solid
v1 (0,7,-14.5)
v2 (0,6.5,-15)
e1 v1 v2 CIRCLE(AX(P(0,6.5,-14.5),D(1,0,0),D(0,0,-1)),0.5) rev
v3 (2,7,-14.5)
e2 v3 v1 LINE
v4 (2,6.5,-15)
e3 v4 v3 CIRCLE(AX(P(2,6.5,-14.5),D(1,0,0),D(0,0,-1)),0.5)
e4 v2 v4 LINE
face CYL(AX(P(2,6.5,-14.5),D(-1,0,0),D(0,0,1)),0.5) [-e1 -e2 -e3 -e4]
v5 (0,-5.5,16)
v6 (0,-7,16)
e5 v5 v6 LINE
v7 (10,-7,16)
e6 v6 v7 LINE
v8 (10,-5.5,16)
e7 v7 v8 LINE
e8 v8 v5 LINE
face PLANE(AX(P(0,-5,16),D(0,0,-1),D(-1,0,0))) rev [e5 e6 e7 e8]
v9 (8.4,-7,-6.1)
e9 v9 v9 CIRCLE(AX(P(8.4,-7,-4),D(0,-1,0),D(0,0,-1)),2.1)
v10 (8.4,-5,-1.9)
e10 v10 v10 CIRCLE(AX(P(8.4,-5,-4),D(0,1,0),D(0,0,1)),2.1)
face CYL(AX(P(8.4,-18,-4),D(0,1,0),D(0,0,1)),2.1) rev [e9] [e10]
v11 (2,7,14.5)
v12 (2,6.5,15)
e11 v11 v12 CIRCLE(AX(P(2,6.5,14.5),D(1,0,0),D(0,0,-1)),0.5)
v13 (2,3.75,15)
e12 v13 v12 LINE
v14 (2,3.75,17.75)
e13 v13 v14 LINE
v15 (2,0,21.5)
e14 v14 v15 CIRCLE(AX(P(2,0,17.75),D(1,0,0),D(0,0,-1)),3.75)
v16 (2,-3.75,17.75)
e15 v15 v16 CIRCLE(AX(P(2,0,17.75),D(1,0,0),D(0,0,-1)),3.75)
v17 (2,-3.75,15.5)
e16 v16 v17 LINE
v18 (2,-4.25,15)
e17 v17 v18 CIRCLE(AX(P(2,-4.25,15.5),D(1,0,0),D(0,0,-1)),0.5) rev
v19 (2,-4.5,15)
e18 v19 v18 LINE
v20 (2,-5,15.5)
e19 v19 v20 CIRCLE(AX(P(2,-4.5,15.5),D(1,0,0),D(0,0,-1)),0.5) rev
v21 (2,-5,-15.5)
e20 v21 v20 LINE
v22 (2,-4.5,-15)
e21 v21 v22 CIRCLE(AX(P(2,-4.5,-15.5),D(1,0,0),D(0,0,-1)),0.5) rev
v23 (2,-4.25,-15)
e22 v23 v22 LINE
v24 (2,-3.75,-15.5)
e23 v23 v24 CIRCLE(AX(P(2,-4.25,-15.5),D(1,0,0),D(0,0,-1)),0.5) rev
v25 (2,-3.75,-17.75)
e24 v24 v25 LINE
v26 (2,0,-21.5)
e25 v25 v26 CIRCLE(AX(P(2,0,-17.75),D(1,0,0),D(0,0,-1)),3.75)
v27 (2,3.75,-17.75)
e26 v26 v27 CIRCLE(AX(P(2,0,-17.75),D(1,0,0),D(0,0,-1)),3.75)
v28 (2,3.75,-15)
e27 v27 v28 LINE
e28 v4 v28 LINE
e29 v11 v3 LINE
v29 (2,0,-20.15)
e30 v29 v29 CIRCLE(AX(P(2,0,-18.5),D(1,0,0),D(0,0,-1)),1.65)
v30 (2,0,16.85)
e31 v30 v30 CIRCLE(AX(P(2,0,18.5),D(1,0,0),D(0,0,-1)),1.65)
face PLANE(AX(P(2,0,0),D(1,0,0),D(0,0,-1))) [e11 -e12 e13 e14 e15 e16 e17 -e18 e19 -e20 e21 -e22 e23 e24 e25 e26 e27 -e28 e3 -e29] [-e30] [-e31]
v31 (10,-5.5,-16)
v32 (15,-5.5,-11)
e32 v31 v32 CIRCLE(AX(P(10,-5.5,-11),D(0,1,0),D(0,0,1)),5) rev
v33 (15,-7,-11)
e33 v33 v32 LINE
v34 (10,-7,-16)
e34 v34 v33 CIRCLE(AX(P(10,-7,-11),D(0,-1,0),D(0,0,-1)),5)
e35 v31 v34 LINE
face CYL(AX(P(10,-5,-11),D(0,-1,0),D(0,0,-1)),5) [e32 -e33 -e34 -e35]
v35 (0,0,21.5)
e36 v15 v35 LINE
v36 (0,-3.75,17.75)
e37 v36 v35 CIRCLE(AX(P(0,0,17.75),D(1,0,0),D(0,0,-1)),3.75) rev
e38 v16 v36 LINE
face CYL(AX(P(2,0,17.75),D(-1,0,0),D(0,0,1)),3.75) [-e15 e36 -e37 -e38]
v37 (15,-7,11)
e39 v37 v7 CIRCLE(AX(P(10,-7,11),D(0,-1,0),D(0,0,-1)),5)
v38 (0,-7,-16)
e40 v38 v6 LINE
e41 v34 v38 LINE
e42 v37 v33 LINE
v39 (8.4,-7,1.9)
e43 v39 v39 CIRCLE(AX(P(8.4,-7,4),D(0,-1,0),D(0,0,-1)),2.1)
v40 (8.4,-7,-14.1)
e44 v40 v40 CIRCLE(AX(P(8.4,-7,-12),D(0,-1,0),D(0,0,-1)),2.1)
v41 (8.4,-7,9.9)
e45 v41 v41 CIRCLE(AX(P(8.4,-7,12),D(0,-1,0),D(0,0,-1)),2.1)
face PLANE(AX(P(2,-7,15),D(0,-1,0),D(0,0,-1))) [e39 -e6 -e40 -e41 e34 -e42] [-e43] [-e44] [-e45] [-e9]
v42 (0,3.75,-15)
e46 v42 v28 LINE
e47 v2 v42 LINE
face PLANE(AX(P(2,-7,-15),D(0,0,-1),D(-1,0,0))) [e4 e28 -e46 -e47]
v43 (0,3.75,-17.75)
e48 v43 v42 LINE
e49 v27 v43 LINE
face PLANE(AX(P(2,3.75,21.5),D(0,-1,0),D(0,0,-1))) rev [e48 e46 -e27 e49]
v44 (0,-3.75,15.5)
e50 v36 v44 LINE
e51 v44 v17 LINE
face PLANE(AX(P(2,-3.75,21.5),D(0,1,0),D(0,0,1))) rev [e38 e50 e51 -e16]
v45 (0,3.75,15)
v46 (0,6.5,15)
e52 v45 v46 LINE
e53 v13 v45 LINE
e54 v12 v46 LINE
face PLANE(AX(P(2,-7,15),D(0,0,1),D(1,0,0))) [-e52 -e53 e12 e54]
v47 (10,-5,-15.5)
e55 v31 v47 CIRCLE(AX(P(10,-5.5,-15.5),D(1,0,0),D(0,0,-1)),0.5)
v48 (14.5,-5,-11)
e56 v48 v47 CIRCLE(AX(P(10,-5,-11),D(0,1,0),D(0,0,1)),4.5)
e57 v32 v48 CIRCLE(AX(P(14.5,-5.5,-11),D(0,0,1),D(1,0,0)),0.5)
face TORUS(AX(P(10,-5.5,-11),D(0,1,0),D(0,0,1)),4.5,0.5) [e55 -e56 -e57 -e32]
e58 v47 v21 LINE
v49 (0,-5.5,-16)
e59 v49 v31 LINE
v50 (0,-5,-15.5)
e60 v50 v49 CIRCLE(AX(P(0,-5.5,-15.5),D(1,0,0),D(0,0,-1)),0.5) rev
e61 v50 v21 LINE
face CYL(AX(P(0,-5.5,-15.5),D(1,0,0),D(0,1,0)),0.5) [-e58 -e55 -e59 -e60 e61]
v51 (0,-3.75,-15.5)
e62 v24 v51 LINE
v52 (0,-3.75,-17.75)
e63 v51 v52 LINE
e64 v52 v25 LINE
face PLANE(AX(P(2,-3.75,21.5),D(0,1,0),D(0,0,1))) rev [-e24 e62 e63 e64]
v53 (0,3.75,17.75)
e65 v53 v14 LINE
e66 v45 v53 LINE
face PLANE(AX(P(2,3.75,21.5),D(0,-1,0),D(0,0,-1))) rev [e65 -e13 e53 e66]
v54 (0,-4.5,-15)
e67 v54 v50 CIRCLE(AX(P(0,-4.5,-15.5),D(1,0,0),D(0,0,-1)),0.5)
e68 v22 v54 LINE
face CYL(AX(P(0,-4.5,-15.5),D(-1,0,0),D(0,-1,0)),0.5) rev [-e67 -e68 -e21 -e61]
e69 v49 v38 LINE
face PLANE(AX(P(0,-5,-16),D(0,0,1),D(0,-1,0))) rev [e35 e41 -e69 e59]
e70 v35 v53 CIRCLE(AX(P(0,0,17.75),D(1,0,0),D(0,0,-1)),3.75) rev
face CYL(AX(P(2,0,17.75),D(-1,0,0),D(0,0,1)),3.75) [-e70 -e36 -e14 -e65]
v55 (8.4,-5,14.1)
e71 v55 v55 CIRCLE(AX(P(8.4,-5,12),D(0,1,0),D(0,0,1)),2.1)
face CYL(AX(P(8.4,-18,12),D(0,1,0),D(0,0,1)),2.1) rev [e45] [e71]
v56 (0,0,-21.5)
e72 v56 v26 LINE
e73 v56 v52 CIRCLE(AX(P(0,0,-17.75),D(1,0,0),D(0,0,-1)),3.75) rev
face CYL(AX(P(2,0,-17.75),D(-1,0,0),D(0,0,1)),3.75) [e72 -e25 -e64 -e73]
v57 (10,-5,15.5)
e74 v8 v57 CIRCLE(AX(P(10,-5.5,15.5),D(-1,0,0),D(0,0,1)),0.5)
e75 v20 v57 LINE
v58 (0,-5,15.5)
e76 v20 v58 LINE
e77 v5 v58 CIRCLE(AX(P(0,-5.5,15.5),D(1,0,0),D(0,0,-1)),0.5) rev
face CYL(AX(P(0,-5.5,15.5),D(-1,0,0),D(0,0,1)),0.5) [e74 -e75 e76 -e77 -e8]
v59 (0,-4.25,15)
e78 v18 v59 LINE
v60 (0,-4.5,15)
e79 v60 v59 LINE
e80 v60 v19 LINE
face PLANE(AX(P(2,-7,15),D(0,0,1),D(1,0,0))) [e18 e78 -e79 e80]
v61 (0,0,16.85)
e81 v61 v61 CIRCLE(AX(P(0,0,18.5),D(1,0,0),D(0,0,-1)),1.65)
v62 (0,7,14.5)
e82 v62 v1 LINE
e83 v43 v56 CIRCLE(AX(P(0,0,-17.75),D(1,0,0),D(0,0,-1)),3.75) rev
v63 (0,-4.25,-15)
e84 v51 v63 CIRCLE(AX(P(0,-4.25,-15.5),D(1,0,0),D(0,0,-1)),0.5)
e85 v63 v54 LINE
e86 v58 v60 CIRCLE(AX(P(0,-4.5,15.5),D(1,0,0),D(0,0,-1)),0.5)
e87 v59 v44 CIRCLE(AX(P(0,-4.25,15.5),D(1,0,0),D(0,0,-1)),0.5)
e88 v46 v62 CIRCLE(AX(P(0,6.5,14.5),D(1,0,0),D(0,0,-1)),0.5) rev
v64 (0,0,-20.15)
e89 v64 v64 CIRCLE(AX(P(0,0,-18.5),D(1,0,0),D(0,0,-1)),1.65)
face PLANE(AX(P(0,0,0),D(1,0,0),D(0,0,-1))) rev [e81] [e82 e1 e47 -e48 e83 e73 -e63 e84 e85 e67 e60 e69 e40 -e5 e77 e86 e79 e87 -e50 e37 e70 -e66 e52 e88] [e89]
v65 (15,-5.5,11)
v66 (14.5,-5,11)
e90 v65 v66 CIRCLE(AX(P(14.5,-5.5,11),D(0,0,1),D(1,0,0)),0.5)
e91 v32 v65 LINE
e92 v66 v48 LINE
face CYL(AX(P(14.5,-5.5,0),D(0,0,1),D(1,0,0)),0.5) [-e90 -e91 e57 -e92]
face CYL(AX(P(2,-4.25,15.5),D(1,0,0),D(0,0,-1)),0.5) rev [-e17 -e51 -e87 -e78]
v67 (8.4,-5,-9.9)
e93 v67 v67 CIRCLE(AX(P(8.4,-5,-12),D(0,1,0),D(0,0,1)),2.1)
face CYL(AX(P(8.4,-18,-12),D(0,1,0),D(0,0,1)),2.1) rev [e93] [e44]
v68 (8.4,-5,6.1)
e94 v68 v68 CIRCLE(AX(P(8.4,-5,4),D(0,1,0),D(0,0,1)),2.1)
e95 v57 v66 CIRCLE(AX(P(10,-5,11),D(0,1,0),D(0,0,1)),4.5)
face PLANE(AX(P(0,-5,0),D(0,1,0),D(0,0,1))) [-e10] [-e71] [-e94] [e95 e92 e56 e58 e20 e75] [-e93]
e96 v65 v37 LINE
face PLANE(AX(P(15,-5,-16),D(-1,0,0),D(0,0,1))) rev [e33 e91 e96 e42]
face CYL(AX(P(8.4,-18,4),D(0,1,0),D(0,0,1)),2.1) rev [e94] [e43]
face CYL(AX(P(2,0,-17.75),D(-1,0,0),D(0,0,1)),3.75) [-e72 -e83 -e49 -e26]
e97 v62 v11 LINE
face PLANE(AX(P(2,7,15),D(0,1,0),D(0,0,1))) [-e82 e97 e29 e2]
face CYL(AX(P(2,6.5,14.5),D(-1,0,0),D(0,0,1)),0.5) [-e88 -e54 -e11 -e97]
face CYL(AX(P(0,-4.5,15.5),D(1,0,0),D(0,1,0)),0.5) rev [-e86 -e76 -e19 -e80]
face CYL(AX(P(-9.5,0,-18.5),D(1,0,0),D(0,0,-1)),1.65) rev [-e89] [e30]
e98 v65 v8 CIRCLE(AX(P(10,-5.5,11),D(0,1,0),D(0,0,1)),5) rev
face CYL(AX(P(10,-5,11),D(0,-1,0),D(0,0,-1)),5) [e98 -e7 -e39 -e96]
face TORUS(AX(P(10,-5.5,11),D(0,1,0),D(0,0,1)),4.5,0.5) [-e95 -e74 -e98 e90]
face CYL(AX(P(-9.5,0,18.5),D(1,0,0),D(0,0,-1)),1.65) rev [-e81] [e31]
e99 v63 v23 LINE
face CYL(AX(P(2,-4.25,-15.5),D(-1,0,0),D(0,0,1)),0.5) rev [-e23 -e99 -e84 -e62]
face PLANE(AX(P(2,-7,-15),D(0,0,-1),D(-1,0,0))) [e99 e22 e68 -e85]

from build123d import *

# Parameters (mm, degrees)
SKETCH_1_W          = 43
SKETCH_1_H          = 7.5
EXTRUDE_1_DEPTH     = 2
SKETCH_2_R          = 1.65
CUT_EXTRUDE_2_DEPTH = 11.5
FILLET_1_R          = 3.75
SKETCH_3_W          = 30
SKETCH_3_H          = 14
EXTRUDE_3_DEPTH     = 2
SKETCH_4_W          = 15
SKETCH_4_H          = 32
EXTRUDE_4_DEPTH     = 2
SKETCH_5_R          = 2.1
CUT_EXTRUDE_3_DEPTH = 13
FILLET_3_R          = 5
FILLET_5_R          = 0.5
FILLET_6_R          = 0.5
FILLET_7_R          = 0.5


with BuildPart() as part:
    # 草圖1 → 填料-伸長1 (new body)
    with BuildSketch(Plane(origin=(0, 0, 0), x_dir=(0, 0, -1), z_dir=(1, 0, 0))):
        Rectangle(SKETCH_1_W, SKETCH_1_H)
    extrude(amount=EXTRUDE_1_DEPTH)

    # 草圖2 → 除料-伸長2 (cut)
    with BuildSketch(Plane(origin=(2, 0, 0), x_dir=(0, 0, -1), z_dir=(1, 0, 0))):
        with Locations((-18.5, 0)):
            Circle(SKETCH_2_R)
        with Locations((18.5, 0)):
            Circle(SKETCH_2_R)
    extrude(amount=-CUT_EXTRUDE_2_DEPTH, mode=Mode.SUBTRACT)

    # 圓角1
    fillet_1_edges = [part.edges().sort_by_distance(p)[0] for p in [
        (1, -3.75, -21.5),
        (1, 3.75, -21.5),
        (1, -3.75, 21.5),
        (1, 3.75, 21.5),
    ]]
    fillet(fillet_1_edges, radius=FILLET_1_R - 0.0001)  # a hair under: the kernel refuses the full size

    # 草圖3 → 填料-伸長3 (add)
    with BuildSketch(Plane.ZY):
        Rectangle(SKETCH_3_W, SKETCH_3_H)
    extrude(amount=-EXTRUDE_3_DEPTH)

    # 草圖4 → 填料-伸長4 (add)
    with BuildSketch(Plane(origin=(0, -7, 0), x_dir=(1, 0, 0), z_dir=(0, 1, 0))):
        with Locations((7.5, 0)):
            Rectangle(SKETCH_4_W, SKETCH_4_H)
    extrude(amount=EXTRUDE_4_DEPTH)

    # 草圖5 → 除料-伸長3 (cut)
    with BuildSketch(Plane(origin=(0, -5, 0), x_dir=(-1, 0, 0), z_dir=(0, 1, 0))):
        with Locations(Location((-8.4, 12, 0), (0, 0, 90))):
            Circle(SKETCH_5_R)
        with Locations(Location((-8.4, 4, 0), (0, 0, 90))):
            Circle(SKETCH_5_R)
        with Locations(Location((-8.4, -4, 0), (0, 0, 90))):
            Circle(SKETCH_5_R)
        with Locations(Location((-8.4, -12, 0), (0, 0, 90))):
            Circle(SKETCH_5_R)
    extrude(amount=-CUT_EXTRUDE_3_DEPTH, mode=Mode.SUBTRACT)

    # 圓角3
    fillet_3_edges = [part.edges().sort_by_distance(p)[0] for p in [
        (15, -6, 16),
        (15, -6, -16),
    ]]
    fillet(fillet_3_edges, radius=FILLET_3_R)

    # 圓角5
    fillet_5_edges = [part.edges().sort_by_distance(p)[0] for p in [
        (1, -3.75, -15),
        (1, -3.75, 15),
        (1, -5, -15),
        (1, -5, 15),
    ]]
    fillet(fillet_5_edges, radius=FILLET_5_R)

    # 圓角6
    fillet_6_edges = [part.edges().sort_by_distance(p)[0] for p in [
        (5, -5, 16),
        (13.535533906, -5, 14.535533906),
        (15, -5, 0),
        (13.535533906, -5, -14.535533906),
        (5, -5, -16),
    ]]
    fillet(fillet_6_edges, radius=FILLET_6_R - 0.0001)  # a hair under: the kernel refuses the full size

    # 圓角7
    fillet_7_edges = [part.edges().sort_by_distance(p)[0] for p in [
        (1, 7, 15),
        (1, 7, -15),
    ]]
    fillet(fillet_7_edges, radius=FILLET_7_R)


solid = part.part
